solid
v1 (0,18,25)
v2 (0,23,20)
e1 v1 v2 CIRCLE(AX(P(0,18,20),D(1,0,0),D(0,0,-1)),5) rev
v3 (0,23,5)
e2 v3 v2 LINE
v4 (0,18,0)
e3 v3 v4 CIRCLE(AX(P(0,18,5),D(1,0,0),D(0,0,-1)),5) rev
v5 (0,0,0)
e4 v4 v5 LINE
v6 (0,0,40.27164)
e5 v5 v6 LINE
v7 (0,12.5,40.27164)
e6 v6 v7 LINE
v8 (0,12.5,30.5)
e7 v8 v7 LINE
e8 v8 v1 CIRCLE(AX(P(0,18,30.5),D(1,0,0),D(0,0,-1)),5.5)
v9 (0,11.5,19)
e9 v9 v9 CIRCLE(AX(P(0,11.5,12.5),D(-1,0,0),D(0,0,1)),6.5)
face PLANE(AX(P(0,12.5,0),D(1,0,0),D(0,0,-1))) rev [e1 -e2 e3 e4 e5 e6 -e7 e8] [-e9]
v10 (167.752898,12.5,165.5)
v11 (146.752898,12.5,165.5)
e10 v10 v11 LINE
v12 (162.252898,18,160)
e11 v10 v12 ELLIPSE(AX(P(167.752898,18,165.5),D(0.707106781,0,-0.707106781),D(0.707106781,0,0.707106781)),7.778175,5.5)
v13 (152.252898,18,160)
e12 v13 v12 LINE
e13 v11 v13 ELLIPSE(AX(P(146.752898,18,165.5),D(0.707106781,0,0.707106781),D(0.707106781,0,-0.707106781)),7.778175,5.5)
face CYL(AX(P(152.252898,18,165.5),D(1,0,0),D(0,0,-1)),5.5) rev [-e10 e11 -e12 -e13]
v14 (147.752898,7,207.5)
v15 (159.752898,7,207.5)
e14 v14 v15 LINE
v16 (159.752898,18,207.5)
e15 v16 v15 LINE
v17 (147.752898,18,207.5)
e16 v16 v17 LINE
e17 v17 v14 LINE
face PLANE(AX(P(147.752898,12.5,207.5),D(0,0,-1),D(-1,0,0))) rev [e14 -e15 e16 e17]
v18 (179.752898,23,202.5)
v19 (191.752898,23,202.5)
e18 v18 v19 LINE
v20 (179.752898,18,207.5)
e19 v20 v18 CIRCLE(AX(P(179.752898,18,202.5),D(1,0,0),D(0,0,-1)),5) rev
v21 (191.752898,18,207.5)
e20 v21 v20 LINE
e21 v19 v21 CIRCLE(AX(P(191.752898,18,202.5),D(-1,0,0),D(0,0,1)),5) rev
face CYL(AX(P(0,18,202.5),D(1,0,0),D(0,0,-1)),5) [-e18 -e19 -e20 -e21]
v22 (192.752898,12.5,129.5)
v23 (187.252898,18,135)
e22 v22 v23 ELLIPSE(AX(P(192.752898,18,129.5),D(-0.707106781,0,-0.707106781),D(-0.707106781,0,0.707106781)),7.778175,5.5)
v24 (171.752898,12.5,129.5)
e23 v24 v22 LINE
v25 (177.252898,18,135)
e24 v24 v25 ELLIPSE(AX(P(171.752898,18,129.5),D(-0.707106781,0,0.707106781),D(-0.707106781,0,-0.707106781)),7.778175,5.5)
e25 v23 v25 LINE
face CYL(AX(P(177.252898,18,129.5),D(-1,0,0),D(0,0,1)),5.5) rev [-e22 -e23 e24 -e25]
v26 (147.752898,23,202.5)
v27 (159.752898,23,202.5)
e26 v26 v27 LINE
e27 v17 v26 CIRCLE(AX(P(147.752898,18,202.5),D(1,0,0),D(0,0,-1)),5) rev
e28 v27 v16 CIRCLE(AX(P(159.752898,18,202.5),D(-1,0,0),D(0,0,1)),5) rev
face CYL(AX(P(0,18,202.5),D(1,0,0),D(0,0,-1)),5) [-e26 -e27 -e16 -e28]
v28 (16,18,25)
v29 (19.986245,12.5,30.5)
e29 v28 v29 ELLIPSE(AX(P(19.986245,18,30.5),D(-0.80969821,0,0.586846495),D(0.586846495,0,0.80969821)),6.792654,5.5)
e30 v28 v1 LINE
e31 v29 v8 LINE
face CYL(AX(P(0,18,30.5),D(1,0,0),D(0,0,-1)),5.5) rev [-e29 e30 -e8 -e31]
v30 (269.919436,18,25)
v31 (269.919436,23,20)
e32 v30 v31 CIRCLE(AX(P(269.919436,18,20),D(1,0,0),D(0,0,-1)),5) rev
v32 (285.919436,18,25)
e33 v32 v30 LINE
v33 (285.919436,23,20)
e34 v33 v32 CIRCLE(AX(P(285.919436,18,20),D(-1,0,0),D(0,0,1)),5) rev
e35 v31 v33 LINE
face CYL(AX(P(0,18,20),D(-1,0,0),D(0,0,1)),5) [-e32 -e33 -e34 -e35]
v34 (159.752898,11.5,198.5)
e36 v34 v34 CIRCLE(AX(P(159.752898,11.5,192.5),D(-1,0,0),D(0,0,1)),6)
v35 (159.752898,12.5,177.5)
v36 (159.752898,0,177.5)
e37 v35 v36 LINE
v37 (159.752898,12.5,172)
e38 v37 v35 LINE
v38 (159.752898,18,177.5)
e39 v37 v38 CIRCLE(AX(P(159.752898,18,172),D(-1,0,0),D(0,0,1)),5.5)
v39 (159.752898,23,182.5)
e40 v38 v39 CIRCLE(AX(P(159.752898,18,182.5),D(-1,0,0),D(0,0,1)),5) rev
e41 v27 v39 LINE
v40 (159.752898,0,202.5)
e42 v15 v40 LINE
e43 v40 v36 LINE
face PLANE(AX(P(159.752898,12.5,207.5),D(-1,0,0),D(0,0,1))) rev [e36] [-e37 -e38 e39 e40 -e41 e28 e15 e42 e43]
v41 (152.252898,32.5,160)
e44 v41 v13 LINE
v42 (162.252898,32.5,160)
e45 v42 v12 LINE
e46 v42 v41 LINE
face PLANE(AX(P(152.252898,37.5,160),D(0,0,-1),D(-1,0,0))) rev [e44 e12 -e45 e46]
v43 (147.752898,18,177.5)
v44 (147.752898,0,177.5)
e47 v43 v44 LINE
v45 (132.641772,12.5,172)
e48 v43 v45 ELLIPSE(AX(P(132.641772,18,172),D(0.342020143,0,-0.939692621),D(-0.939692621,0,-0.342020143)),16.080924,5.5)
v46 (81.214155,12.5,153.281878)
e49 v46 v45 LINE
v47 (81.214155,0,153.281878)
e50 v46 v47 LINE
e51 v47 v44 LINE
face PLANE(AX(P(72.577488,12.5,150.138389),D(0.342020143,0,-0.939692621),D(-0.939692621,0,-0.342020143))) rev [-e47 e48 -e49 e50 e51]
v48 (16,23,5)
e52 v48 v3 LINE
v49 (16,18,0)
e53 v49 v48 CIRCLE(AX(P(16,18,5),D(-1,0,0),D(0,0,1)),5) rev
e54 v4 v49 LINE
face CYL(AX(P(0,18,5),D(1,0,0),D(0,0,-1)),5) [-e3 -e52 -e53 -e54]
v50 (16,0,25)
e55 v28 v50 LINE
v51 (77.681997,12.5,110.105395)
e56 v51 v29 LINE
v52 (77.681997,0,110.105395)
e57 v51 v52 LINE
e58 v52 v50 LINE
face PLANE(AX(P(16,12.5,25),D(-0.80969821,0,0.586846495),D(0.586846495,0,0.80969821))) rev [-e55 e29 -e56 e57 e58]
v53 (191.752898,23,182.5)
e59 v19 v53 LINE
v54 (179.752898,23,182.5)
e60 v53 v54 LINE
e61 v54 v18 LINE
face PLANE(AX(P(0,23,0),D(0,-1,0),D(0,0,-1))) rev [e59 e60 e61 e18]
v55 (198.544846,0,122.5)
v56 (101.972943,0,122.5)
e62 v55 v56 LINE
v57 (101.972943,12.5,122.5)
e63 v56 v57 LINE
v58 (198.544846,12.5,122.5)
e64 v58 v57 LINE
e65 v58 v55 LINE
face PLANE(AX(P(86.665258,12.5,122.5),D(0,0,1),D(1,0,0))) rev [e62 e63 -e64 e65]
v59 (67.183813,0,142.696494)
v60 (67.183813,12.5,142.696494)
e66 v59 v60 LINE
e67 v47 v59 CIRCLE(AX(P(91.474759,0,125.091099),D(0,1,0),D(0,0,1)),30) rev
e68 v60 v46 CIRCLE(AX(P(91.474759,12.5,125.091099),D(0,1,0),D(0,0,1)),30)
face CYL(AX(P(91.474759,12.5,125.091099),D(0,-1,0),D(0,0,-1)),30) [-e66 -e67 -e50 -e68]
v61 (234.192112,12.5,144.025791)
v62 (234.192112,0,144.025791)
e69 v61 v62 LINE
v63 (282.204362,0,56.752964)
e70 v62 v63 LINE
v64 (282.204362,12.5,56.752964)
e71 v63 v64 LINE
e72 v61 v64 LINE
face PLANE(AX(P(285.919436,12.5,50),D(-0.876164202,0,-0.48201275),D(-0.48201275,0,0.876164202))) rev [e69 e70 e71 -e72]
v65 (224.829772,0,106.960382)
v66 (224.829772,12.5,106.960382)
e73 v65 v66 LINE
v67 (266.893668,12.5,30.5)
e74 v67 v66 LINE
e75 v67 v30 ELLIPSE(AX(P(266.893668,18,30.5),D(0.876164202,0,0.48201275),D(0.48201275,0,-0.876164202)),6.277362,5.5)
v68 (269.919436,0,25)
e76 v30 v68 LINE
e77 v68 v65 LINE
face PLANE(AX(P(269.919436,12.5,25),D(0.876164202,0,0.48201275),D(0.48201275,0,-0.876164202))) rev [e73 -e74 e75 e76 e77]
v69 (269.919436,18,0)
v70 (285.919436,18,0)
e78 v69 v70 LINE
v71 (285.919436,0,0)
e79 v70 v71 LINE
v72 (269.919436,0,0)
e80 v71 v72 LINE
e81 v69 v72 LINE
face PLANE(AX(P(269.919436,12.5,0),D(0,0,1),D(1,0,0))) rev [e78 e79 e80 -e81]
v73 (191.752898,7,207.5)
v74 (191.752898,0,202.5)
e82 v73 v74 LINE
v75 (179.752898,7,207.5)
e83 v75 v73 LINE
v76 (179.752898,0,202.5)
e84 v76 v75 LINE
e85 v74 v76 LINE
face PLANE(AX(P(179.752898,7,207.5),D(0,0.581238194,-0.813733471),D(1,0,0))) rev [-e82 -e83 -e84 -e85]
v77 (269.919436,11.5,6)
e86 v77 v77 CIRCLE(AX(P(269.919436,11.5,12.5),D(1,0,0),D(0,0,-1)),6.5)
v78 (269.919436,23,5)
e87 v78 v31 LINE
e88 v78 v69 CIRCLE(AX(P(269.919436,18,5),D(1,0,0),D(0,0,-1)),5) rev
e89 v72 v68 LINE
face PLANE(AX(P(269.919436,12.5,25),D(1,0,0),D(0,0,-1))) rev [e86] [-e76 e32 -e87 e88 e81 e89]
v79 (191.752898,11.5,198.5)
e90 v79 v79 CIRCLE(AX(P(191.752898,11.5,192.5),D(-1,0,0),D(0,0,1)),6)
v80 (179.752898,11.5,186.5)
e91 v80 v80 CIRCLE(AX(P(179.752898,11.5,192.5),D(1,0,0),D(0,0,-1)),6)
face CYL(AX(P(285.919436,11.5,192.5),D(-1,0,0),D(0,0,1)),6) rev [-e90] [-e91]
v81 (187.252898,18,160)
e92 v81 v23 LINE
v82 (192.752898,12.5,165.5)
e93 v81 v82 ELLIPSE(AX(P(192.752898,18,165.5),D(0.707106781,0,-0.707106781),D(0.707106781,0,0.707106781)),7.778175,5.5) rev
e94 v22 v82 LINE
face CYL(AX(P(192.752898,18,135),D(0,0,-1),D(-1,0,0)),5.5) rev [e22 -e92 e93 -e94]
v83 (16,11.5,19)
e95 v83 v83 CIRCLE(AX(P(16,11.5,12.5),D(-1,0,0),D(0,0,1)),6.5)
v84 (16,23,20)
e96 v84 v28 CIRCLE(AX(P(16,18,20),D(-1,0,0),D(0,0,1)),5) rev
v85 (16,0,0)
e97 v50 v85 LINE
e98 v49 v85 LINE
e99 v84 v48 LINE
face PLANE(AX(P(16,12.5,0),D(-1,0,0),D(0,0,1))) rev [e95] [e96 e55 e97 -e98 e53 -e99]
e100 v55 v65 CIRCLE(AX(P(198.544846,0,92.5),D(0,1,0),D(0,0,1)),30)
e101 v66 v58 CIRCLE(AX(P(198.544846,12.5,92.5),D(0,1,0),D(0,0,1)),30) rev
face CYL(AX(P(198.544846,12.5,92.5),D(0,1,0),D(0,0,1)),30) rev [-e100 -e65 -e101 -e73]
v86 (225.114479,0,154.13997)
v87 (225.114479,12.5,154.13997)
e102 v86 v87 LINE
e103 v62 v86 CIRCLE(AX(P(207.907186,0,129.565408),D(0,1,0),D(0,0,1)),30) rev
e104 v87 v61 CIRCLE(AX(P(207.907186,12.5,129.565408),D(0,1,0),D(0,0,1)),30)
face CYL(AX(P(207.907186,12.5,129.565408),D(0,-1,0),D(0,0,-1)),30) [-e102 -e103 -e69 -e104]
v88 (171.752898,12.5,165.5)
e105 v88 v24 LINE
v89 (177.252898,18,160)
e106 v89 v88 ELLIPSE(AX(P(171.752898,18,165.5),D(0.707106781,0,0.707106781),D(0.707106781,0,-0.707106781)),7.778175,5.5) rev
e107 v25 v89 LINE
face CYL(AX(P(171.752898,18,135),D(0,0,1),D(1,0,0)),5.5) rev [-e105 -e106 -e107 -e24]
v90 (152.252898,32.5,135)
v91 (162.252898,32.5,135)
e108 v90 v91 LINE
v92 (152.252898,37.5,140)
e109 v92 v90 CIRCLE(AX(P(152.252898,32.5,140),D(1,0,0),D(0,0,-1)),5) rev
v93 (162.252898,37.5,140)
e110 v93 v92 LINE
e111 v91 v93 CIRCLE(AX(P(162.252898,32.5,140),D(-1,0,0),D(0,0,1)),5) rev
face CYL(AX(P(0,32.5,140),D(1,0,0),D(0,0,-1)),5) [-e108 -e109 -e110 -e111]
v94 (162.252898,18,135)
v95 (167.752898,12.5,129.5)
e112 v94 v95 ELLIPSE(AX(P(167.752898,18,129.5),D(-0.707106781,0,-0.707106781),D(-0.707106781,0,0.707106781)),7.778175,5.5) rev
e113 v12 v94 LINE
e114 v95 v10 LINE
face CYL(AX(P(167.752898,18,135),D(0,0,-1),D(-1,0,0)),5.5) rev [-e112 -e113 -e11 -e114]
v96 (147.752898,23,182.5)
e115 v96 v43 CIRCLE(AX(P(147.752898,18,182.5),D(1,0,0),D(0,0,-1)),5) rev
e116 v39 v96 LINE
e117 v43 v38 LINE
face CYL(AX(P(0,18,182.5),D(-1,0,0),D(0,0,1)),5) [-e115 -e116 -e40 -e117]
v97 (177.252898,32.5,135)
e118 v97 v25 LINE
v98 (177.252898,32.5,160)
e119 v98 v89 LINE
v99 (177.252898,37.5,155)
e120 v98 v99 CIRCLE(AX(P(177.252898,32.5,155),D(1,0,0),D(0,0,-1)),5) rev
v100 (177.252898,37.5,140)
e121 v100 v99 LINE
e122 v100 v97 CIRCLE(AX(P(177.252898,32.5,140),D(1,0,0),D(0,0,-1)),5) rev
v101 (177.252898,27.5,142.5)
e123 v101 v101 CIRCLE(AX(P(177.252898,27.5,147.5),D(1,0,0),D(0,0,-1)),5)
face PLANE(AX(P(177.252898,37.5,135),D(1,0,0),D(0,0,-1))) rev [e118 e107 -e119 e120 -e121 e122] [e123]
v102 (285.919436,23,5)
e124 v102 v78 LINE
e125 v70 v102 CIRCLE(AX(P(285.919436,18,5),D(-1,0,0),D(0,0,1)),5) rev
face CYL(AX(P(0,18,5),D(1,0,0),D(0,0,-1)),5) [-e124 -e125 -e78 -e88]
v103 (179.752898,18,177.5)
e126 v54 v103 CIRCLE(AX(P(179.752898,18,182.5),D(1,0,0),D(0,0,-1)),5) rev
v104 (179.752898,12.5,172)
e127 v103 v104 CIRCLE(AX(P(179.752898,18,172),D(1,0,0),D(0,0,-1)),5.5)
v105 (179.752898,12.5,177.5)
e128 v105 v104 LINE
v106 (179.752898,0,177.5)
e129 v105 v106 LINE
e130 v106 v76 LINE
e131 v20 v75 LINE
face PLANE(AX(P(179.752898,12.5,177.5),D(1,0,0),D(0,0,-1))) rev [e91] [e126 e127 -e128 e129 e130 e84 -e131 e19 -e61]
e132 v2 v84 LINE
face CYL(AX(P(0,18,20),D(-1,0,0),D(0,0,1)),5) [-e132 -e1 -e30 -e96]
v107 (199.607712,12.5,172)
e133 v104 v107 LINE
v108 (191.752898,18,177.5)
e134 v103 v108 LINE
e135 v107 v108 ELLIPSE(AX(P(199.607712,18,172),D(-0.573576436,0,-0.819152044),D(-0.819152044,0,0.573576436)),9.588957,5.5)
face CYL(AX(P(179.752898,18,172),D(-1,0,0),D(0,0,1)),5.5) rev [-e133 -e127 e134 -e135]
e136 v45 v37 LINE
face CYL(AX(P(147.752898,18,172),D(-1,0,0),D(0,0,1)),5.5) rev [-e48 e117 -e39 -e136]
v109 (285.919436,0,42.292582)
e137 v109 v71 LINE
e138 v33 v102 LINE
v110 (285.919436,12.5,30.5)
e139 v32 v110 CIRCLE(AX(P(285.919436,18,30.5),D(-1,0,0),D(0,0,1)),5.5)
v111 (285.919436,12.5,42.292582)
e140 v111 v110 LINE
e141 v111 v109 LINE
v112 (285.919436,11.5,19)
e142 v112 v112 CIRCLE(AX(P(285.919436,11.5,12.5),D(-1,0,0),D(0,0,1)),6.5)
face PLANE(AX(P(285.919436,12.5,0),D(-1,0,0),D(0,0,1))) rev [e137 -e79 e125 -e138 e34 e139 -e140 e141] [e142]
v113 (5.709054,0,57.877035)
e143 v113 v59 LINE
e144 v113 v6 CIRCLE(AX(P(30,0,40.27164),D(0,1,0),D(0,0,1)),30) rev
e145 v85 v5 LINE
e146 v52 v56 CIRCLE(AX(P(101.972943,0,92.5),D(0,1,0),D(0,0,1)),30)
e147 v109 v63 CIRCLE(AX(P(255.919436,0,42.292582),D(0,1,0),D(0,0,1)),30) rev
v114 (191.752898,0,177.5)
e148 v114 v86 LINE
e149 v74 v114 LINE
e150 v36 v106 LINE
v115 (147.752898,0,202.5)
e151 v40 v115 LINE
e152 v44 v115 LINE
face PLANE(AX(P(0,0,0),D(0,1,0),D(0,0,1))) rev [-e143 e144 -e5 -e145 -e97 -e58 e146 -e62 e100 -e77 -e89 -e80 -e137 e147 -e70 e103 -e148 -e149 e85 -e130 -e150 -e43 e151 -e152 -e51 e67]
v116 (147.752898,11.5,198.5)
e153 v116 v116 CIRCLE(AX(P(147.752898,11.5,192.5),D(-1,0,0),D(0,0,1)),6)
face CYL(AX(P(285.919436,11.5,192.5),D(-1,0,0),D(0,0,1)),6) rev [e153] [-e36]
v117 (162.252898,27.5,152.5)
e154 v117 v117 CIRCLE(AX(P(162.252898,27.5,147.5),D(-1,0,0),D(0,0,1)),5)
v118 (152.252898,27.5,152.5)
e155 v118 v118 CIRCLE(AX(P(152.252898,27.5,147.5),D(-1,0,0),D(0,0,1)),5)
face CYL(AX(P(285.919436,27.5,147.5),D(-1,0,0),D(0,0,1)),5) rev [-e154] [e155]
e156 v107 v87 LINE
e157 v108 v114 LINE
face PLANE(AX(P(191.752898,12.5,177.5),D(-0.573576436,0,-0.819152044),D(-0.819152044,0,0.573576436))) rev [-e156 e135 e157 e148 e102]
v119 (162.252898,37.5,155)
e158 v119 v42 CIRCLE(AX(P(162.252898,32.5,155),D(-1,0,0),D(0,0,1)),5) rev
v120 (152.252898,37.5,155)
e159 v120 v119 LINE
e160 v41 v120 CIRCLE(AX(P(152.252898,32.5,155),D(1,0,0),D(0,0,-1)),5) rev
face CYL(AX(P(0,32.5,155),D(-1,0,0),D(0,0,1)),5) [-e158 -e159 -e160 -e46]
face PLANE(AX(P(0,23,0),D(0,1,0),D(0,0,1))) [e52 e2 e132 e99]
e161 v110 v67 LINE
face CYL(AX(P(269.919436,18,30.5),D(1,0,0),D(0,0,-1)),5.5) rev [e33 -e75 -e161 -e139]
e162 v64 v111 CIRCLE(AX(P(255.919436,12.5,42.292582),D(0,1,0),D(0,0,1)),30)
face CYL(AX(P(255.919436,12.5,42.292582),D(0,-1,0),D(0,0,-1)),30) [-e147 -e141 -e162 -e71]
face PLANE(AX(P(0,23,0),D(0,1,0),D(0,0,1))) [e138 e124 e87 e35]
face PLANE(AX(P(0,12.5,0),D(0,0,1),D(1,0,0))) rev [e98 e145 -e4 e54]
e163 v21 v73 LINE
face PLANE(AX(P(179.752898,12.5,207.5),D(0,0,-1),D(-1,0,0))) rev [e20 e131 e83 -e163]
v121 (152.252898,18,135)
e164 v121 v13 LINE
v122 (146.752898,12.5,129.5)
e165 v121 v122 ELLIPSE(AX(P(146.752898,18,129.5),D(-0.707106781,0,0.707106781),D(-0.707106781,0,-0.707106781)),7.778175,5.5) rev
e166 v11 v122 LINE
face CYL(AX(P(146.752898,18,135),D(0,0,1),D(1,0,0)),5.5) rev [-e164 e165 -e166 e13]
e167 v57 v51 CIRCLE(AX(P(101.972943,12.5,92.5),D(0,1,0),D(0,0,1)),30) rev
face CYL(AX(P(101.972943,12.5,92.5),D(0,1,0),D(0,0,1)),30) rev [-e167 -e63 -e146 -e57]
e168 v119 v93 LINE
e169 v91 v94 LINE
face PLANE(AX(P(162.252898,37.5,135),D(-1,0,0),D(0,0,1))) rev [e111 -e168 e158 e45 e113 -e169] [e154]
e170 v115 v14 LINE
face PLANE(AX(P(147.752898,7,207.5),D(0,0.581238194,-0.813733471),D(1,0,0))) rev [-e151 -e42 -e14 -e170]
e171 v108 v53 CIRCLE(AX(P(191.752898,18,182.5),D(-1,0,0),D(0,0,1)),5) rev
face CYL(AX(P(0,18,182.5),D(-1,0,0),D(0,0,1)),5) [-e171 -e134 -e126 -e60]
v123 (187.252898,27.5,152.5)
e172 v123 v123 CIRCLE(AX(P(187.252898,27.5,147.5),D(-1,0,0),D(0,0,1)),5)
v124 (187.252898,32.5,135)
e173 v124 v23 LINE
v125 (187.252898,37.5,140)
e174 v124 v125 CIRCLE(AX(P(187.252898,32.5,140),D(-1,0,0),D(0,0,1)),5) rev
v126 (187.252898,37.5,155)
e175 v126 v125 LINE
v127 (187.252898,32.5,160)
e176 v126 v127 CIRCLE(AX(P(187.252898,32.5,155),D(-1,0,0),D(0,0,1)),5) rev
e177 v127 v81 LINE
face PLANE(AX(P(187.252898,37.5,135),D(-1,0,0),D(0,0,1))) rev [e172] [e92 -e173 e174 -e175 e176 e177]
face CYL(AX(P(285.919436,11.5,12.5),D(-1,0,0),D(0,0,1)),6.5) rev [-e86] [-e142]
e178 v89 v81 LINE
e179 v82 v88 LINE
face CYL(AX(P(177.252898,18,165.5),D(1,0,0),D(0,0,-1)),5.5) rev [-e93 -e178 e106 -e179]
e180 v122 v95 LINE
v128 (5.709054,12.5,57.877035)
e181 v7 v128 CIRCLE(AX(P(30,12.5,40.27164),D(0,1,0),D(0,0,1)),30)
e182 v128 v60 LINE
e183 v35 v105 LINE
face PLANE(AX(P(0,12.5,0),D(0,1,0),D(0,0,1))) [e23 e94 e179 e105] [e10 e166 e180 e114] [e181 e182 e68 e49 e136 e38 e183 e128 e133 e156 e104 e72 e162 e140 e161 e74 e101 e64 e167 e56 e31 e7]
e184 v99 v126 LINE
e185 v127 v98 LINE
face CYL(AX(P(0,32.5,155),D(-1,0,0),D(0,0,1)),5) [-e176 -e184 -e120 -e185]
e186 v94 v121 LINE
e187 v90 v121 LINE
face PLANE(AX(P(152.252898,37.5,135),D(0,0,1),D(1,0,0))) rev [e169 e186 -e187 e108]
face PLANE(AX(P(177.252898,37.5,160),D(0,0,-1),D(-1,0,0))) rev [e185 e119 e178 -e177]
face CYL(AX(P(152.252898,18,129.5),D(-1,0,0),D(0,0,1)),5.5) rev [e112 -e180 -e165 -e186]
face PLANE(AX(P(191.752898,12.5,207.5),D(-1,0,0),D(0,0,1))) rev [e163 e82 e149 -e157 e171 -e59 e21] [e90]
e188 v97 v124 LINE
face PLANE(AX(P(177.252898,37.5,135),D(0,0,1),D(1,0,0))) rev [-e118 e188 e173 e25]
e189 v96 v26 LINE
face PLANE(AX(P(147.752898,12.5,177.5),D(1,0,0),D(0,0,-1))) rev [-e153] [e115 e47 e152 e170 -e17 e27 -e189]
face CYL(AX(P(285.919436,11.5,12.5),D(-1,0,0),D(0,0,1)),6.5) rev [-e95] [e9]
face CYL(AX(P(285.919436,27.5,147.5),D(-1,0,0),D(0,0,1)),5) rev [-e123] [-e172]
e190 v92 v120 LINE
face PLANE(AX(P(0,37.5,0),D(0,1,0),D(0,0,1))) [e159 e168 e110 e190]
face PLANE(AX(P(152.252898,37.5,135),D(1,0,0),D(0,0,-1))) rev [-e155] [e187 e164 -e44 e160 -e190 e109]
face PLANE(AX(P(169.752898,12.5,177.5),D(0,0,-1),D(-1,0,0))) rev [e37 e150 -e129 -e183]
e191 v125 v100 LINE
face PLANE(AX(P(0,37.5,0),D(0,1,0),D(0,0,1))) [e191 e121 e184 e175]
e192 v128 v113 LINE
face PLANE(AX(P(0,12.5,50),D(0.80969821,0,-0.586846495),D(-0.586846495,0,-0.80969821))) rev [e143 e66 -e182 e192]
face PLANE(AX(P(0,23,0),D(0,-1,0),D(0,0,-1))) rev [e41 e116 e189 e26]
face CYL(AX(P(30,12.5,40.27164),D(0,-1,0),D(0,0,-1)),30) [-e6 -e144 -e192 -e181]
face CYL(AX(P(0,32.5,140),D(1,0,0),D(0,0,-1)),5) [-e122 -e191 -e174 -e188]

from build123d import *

# Parameters (mm, degrees)
BOSS_EXTRUDE1_DEPTH = 12.5
SKETCH5_W           = 10
SKETCH5_H           = 25
BOSS_EXTRUDE2_DEPTH = 25
SKETCH7_W           = 12
SKETCH7_H           = 30
BOSS_EXTRUDE4_DEPTH = 10.5
SKETCH8_R           = 6
CUT_EXTRUDE1_DEPTH  = 258.475083954
SKETCH11_W          = 16
SKETCH11_H          = 25
BOSS_EXTRUDE6_DEPTH = 10.5
SKETCH12_R          = 6.5
CUT_EXTRUDE3_DEPTH  = 356.26387941
SKETCH13_R          = 5
CUT_EXTRUDE4_DEPTH  = 261.08353454
FILLET2_R           = 30
FILLET3_R           = 5
FILLET4_R           = 5.5
CHAMFER1_SIZE       = 5
CHAMFER1_SIZE2      = 7


with BuildPart() as part:
    # Sketch2 → Boss-Extrude1 (new body)
    with BuildSketch(Plane(origin=(0, 0, 0), x_dir=(1, 0, 0), z_dir=(0, 1, 0))):
        Polygon((72.577488302, -150.138388534), (147.752897965, -177.5), (147.752897965, -207.5), (159.752897965, -207.5), (159.752897965, -177.5), (169.752897965, -177.5), (179.752897965, -177.5), (179.752897965, -207.5), (191.752897965, -207.5), (191.752897965, -177.5), (230.829328841, -150.138388534), (285.919436229, -50), (285.919436229, 0), (269.919436229, 0), (269.919436229, -25), (216.280811233, -122.5), (86.665258479, -122.5), (16, -25), (16, 0), (0, 0), (0, -50), align=None)
    extrude(amount=BOSS_EXTRUDE1_DEPTH)

    # Sketch5 → Boss-Extrude2 (add)
    with BuildSketch(Plane(origin=(0, 12.5, 0), x_dir=(1, 0, 0), z_dir=(0, 1, 0))):
        with Locations((157.252897965, -147.5)):
            Rectangle(SKETCH5_W, SKETCH5_H)
        with Locations((182.252897965, -147.5)):
            Rectangle(SKETCH5_W, SKETCH5_H)
    extrude(amount=BOSS_EXTRUDE2_DEPTH)

    # Sketch7 → Boss-Extrude4 (add)
    with BuildSketch(Plane(origin=(0, 12.5, 0), x_dir=(1, 0, 0), z_dir=(0, 1, 0))):
        with Locations((153.752897965, -192.5)):
            Rectangle(SKETCH7_W, SKETCH7_H)
        with Locations((185.752897965, -192.5)):
            Rectangle(SKETCH7_W, SKETCH7_H)
    extrude(amount=BOSS_EXTRUDE4_DEPTH)

    # Sketch8 → Cut-Extrude1 (cut, through all)
    with BuildSketch(Plane.ZY.offset(-147.752897965)):
        with Locations((192.5, 11.5)):
            Circle(SKETCH8_R)
    extrude(amount=-CUT_EXTRUDE1_DEPTH, mode=Mode.SUBTRACT)

    # Sketch11 → Boss-Extrude6 (add)
    with BuildSketch(Plane(origin=(0, 12.5, 0), x_dir=(1, 0, 0), z_dir=(0, 1, 0))):
        with Locations((8, -12.5)):
            Rectangle(SKETCH11_W, SKETCH11_H)
        with Locations((277.919436229, -12.5)):
            Rectangle(SKETCH11_W, SKETCH11_H)
    extrude(amount=BOSS_EXTRUDE6_DEPTH)

    # Sketch12 → Cut-Extrude3 (cut, through all)
    with BuildSketch(Plane.ZY):
        with Locations((12.5, 11.5)):
            Circle(SKETCH12_R)
    extrude(amount=-CUT_EXTRUDE3_DEPTH, mode=Mode.SUBTRACT)

    # Sketch13 → Cut-Extrude4 (cut, through all)
    with BuildSketch(Plane.ZY.offset(-152.252897965)):
        with Locations((147.5, 27.5)):
            Circle(SKETCH13_R)
    extrude(amount=-CUT_EXTRUDE4_DEPTH, mode=Mode.SUBTRACT)

    # Fillet2
    fillet2_edges = [part.edges().sort_by_distance(p)[0] for p in [
        (0, 6.25, 50),
        (86.665258479, 6.25, 122.5),
        (216.280811233, 6.25, 122.5),
        (285.919436229, 6.25, 50),
        (230.829328841, 6.25, 150.138388534),
        (72.577488302, 6.25, 150.138388534),
    ]]
    fillet(fillet2_edges, radius=FILLET2_R)

    # Fillet3
    fillet3_edges = [part.edges().sort_by_distance(p)[0] for p in [
        (185.752897965, 23, 207.5),
        (185.752897965, 23, 177.5),
        (8, 23, 25),
        (8, 23, 0),
        (277.919436229, 23, 25),
        (277.919436229, 23, 0),
        (157.252897965, 37.5, 160),
        (157.252897965, 37.5, 135),
        (182.252897965, 37.5, 160),
        (182.252897965, 37.5, 135),
        (153.752897965, 23, 207.5),
        (153.752897965, 23, 177.5),
    ]]
    fillet(fillet3_edges, radius=FILLET3_R)

    # Fillet4
    fillet4_edges = [part.edges().sort_by_distance(p)[0] for p in [
        (153.752897965, 12.5, 177.5),
        (185.752897965, 12.5, 177.5),
        (182.252897965, 12.5, 135),
        (157.252897965, 12.5, 135),
        (182.252897965, 12.5, 160),
        (157.252897965, 12.5, 160),
        (8, 12.5, 25),
        (277.919436229, 12.5, 25),
        (152.252897965, 12.5, 147.5),
        (187.252897965, 12.5, 147.5),
        (177.252897965, 12.5, 147.5),
        (162.252897965, 12.5, 147.5),
    ]]
    fillet(fillet4_edges, radius=FILLET4_R - 0.0001)  # a hair under: the kernel refuses the full size

    # Chamfer1
    chamfer1_edges = [part.edges().sort_by_distance(p)[0] for p in [
        (185.752897965, 0, 207.5),
        (153.752897965, 0, 207.5),
    ]]
    chamfer1_side = [part.faces().sort_by_distance(p)[0] for p in [
        (115.691812184, 0, 162.071200665),
    ]]
    chamfer(chamfer1_edges, length=CHAMFER1_SIZE, length2=CHAMFER1_SIZE2, reference=chamfer1_side[0])


solid = part.part
